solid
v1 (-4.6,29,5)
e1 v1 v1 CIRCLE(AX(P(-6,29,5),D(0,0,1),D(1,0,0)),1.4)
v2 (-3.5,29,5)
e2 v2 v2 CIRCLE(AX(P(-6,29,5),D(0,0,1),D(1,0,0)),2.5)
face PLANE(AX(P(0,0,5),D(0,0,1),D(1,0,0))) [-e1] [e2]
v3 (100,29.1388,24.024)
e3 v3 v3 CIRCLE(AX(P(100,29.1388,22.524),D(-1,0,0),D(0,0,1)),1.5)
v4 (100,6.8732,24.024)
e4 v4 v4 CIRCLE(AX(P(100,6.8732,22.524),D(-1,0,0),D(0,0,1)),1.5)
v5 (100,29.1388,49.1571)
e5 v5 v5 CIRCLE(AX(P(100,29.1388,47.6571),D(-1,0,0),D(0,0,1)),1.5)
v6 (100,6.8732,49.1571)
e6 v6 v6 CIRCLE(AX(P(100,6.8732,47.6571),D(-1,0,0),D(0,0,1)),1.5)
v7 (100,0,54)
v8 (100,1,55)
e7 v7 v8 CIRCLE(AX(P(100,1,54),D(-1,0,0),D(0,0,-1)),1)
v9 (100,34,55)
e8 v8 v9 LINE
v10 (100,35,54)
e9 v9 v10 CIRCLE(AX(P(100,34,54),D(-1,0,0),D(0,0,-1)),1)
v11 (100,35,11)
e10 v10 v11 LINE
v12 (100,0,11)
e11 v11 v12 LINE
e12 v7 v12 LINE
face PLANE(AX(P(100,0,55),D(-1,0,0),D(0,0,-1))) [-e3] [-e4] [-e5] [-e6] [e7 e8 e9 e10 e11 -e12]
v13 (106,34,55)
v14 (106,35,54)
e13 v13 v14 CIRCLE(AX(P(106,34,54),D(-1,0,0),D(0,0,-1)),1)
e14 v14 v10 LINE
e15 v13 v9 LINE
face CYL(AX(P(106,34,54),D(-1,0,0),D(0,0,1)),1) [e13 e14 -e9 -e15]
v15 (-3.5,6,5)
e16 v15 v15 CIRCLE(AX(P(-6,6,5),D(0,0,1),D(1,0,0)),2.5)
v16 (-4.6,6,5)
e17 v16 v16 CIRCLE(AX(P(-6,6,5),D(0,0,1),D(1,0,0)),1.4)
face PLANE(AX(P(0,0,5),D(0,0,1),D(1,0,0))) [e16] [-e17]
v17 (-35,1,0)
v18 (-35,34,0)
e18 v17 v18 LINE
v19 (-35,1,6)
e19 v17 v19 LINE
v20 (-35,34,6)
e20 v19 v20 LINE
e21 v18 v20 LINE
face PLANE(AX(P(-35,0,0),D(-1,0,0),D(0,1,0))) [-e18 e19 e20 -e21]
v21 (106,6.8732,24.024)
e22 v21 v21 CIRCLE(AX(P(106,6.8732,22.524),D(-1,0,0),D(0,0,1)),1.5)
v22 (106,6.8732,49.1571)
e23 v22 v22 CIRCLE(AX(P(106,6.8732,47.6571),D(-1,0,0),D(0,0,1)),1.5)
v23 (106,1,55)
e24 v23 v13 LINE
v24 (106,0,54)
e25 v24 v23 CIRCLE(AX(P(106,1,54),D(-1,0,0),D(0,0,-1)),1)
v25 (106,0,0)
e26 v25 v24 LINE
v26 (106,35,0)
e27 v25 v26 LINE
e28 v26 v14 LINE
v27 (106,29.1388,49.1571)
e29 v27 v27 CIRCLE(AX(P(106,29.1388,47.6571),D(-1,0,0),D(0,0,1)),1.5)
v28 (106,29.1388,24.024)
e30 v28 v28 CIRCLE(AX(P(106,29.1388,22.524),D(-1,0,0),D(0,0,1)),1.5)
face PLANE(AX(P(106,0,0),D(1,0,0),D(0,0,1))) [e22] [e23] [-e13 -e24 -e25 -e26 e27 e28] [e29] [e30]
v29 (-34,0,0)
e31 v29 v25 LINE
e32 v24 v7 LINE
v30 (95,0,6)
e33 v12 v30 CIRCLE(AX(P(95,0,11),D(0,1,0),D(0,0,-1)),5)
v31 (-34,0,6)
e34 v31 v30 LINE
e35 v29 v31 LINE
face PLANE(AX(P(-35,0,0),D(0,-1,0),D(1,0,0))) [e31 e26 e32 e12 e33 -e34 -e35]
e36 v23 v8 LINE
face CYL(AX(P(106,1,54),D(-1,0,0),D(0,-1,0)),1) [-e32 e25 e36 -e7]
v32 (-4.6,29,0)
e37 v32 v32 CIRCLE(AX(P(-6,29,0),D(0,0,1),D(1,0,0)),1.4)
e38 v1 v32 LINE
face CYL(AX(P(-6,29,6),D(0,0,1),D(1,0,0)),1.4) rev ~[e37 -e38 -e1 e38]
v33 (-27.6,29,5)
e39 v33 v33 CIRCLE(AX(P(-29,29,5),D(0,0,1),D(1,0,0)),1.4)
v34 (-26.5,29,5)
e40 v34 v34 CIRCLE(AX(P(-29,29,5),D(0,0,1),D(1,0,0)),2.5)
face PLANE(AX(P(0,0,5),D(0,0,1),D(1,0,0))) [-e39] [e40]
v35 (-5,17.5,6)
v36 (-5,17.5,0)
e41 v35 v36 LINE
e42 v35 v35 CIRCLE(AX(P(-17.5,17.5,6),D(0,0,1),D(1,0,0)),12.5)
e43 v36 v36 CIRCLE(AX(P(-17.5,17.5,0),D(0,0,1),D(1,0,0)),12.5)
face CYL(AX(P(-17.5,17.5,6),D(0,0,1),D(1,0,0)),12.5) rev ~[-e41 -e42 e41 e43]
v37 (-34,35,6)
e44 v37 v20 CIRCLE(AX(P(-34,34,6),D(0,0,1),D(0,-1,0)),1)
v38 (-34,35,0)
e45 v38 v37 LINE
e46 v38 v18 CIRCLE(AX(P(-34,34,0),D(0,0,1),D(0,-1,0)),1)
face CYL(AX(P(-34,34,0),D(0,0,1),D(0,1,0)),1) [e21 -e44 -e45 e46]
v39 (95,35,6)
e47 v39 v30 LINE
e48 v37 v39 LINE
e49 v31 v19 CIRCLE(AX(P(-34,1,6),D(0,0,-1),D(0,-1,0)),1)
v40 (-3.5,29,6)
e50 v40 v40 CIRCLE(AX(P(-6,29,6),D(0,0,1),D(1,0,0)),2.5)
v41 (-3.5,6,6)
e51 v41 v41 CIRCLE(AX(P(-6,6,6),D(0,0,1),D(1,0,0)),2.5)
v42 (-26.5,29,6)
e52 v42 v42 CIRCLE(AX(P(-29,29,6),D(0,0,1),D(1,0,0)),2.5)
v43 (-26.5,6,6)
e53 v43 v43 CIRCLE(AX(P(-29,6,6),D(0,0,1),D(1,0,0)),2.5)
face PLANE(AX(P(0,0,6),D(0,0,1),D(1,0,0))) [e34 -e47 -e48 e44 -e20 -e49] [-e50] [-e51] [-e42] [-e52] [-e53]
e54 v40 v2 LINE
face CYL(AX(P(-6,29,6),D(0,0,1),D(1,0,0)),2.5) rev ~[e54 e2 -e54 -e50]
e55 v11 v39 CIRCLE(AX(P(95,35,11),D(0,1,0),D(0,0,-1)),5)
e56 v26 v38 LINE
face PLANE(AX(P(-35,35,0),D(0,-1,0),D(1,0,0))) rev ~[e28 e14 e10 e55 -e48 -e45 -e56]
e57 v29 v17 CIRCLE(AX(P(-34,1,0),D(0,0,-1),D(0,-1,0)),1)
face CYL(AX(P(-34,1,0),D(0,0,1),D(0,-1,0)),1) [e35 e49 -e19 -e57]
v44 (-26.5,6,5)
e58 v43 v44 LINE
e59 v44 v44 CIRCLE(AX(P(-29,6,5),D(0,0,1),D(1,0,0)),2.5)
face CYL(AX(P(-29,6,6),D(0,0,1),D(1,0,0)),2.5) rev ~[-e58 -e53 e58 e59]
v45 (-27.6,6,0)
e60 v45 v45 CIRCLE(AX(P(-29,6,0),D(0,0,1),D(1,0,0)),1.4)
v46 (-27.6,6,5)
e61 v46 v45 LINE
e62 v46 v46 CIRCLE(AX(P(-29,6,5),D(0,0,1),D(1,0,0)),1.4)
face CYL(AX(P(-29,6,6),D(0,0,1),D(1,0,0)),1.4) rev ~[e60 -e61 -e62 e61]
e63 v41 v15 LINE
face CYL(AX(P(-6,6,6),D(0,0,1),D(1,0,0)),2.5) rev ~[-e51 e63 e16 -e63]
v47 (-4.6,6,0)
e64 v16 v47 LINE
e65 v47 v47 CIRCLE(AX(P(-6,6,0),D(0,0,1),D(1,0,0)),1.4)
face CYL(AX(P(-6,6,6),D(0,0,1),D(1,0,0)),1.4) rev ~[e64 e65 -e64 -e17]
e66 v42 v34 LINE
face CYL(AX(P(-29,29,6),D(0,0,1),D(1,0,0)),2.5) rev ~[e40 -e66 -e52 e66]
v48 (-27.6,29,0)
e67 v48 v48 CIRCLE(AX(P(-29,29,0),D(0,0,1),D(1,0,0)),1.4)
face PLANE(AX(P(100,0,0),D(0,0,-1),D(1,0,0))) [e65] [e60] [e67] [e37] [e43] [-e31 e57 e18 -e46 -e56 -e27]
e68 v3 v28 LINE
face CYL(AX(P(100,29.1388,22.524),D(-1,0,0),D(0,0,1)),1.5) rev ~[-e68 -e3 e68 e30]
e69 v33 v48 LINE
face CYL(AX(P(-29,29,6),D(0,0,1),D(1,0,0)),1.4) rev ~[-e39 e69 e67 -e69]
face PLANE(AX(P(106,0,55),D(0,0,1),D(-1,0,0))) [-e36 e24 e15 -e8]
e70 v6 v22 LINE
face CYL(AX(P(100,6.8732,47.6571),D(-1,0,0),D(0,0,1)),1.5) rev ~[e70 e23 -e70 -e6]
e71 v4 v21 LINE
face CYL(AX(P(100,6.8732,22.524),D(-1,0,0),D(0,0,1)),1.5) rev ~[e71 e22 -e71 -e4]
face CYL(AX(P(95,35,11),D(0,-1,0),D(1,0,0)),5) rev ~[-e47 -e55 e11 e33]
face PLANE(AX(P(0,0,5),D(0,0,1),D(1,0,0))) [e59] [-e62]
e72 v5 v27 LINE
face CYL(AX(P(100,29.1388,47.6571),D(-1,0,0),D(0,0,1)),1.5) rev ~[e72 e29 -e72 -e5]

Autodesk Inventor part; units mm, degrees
ref_plane "YZ Plane" through (0, 0, 0) normal (1, 0, 0) x (0, 1, 0)
ref_plane "XZ Plane" through (0, 0, 0) normal (0, 1, 0) x (-1, 0, 0)
ref_plane "XY Plane" through (0, 0, 0) normal (0, 0, 1) x (1, 0, 0)
sketch "Skizze1" plane through (0, 0, 0) normal (0, 0, 1) x (1, 0, 0)
  line L0 (0, 0) -> (-35, 0)
  line L1 (-35, 0) -> (-35, 35)
  line L2 (-35, 35) -> (0, 35)
  line L3 (0, 35) -> (0, 0)
  dimension "d0" = 35
  dimension "d1" = 35
extrude "NEMA11 Halter" add sketch "Skizze1" along normal blind 6
sketch "Skizze2" plane through (0, 0, 6) normal (0, 0, 1) x (1, 0, 0)
  circle A0 centre (-17.5, 17.5) radius 12.5
  dimension "d4" = 25
extrude "Motorloch" cut sketch "Skizze2" against normal up to surface (6 mm away)
sketch "Skizze3" plane through (0, 0, 6) normal (0, 0, 1) x (1, 0, 0)
  circle A0 centre (-29, 29) radius 1.4
  circle A1 centre (-17.5, 17.5) radius 12.5 projected
  line L0 (-35, 0) -> (-35, 35) projected
  line L1 (0, 0) -> (-35, 0) projected
  line L2 (0, 35) -> (0, 0) projected
  line L3 (-35, 35) -> (0, 35) projected
  circle A2 centre (-6, 29) radius 1.4
  circle A3 centre (-29, 6) radius 1.4
  circle A4 centre (-6, 6) radius 1.4
  dimension "d7" = 2.8
  dimension "d8" = 2.8
  dimension "d9" = 23
  dimension "d10" = 2.8
  dimension "d11" = 23
  dimension "d12" = 2.8
  dimension "d13" = 23
  dimension "d14" = 23
extrude "Motorschrauben" cut sketch "Skizze3" against normal up to surface (6 mm away) contours A0 | A2 | A3 | A4
sketch "Skizze22" plane through (0, 0, 6) normal (0, 0, 1) x (1, 0, 0)
  circle A0 centre (-6, 6) radius 1.4 projected
  circle A1 centre (-29, 29) radius 1.4 projected
  circle A2 centre (-6, 29) radius 1.4 projected
  circle A3 centre (-29, 6) radius 1.4 projected
  circle A4 centre (-29, 29) radius 2.5
  circle A5 centre (-6, 29) radius 2.5
  circle A6 centre (-6, 6) radius 2.5
  circle A7 centre (-29, 6) radius 2.5
  dimension "d78" = 5
  dimension "d79" = 5
  dimension "d80" = 5
  dimension "d81" = 5
extrude "Extrusion16" cut sketch "Skizze22" against normal blind 1
sketch "Skizze23" plane through (0, 0, 6) normal (0, 0, 1) x (1, 0, 0)
  line L0 (0, 35) -> (100, 35)
  line L1 (100, 35) -> (100, 0)
  line L2 (100, 0) -> (0, 0)
  line L3 (0, 0) -> (0, 35)
  dimension "d84" = 100
extrude "Extrusion17" add sketch "Skizze23" against normal blind 6
sketch "Skizze24" plane through (-35, 0, 0) normal (0, -1, 0) x (1, 0, 0)
  line L0 (135, 0) -> (141, 0)
  line L1 (141, 0) -> (141, 55)
  line L2 (141, 55) -> (135, 55)
  line L3 (135, 55) -> (135, 0)
  point P0 (35, 0)
  dimension "d87" = 6
  dimension "d88" = 55
extrude "Extrusion18" add sketch "Skizze24" against normal up to surface (35 mm away)
fillet "Rundung8" radius 5 1 edges at (100, 17.5, 6)
fillet "Rundung9" radius 1 2 edges at (103, 0, 55) (103, 35, 55)
fillet "Rundung10" radius 1 2 edges at (-35, 0, 3) (-35, 35, 3)
sketch "Skizze25" plane through (100, 0, 11) normal (-1, 0, 0) x (0, 0, 1)
  circle A0 centre (36.6571, 29.1388) radius 1.5
  circle A1 centre (36.6571, 6.8732) radius 1.5
  circle A2 centre (11.524, 29.1388) radius 1.5
  circle A3 centre (11.524, 6.8732) radius 1.5
  point P0 (-11, 0)
  dimension "d94" = 3
  dimension "d95" = 3
  dimension "d96" = 3
  dimension "d97" = 3
extrude "Extrusion19" cut sketch "Skizze25" against normal up to surface (6 mm away)
properties part number "Einfach Nema"
